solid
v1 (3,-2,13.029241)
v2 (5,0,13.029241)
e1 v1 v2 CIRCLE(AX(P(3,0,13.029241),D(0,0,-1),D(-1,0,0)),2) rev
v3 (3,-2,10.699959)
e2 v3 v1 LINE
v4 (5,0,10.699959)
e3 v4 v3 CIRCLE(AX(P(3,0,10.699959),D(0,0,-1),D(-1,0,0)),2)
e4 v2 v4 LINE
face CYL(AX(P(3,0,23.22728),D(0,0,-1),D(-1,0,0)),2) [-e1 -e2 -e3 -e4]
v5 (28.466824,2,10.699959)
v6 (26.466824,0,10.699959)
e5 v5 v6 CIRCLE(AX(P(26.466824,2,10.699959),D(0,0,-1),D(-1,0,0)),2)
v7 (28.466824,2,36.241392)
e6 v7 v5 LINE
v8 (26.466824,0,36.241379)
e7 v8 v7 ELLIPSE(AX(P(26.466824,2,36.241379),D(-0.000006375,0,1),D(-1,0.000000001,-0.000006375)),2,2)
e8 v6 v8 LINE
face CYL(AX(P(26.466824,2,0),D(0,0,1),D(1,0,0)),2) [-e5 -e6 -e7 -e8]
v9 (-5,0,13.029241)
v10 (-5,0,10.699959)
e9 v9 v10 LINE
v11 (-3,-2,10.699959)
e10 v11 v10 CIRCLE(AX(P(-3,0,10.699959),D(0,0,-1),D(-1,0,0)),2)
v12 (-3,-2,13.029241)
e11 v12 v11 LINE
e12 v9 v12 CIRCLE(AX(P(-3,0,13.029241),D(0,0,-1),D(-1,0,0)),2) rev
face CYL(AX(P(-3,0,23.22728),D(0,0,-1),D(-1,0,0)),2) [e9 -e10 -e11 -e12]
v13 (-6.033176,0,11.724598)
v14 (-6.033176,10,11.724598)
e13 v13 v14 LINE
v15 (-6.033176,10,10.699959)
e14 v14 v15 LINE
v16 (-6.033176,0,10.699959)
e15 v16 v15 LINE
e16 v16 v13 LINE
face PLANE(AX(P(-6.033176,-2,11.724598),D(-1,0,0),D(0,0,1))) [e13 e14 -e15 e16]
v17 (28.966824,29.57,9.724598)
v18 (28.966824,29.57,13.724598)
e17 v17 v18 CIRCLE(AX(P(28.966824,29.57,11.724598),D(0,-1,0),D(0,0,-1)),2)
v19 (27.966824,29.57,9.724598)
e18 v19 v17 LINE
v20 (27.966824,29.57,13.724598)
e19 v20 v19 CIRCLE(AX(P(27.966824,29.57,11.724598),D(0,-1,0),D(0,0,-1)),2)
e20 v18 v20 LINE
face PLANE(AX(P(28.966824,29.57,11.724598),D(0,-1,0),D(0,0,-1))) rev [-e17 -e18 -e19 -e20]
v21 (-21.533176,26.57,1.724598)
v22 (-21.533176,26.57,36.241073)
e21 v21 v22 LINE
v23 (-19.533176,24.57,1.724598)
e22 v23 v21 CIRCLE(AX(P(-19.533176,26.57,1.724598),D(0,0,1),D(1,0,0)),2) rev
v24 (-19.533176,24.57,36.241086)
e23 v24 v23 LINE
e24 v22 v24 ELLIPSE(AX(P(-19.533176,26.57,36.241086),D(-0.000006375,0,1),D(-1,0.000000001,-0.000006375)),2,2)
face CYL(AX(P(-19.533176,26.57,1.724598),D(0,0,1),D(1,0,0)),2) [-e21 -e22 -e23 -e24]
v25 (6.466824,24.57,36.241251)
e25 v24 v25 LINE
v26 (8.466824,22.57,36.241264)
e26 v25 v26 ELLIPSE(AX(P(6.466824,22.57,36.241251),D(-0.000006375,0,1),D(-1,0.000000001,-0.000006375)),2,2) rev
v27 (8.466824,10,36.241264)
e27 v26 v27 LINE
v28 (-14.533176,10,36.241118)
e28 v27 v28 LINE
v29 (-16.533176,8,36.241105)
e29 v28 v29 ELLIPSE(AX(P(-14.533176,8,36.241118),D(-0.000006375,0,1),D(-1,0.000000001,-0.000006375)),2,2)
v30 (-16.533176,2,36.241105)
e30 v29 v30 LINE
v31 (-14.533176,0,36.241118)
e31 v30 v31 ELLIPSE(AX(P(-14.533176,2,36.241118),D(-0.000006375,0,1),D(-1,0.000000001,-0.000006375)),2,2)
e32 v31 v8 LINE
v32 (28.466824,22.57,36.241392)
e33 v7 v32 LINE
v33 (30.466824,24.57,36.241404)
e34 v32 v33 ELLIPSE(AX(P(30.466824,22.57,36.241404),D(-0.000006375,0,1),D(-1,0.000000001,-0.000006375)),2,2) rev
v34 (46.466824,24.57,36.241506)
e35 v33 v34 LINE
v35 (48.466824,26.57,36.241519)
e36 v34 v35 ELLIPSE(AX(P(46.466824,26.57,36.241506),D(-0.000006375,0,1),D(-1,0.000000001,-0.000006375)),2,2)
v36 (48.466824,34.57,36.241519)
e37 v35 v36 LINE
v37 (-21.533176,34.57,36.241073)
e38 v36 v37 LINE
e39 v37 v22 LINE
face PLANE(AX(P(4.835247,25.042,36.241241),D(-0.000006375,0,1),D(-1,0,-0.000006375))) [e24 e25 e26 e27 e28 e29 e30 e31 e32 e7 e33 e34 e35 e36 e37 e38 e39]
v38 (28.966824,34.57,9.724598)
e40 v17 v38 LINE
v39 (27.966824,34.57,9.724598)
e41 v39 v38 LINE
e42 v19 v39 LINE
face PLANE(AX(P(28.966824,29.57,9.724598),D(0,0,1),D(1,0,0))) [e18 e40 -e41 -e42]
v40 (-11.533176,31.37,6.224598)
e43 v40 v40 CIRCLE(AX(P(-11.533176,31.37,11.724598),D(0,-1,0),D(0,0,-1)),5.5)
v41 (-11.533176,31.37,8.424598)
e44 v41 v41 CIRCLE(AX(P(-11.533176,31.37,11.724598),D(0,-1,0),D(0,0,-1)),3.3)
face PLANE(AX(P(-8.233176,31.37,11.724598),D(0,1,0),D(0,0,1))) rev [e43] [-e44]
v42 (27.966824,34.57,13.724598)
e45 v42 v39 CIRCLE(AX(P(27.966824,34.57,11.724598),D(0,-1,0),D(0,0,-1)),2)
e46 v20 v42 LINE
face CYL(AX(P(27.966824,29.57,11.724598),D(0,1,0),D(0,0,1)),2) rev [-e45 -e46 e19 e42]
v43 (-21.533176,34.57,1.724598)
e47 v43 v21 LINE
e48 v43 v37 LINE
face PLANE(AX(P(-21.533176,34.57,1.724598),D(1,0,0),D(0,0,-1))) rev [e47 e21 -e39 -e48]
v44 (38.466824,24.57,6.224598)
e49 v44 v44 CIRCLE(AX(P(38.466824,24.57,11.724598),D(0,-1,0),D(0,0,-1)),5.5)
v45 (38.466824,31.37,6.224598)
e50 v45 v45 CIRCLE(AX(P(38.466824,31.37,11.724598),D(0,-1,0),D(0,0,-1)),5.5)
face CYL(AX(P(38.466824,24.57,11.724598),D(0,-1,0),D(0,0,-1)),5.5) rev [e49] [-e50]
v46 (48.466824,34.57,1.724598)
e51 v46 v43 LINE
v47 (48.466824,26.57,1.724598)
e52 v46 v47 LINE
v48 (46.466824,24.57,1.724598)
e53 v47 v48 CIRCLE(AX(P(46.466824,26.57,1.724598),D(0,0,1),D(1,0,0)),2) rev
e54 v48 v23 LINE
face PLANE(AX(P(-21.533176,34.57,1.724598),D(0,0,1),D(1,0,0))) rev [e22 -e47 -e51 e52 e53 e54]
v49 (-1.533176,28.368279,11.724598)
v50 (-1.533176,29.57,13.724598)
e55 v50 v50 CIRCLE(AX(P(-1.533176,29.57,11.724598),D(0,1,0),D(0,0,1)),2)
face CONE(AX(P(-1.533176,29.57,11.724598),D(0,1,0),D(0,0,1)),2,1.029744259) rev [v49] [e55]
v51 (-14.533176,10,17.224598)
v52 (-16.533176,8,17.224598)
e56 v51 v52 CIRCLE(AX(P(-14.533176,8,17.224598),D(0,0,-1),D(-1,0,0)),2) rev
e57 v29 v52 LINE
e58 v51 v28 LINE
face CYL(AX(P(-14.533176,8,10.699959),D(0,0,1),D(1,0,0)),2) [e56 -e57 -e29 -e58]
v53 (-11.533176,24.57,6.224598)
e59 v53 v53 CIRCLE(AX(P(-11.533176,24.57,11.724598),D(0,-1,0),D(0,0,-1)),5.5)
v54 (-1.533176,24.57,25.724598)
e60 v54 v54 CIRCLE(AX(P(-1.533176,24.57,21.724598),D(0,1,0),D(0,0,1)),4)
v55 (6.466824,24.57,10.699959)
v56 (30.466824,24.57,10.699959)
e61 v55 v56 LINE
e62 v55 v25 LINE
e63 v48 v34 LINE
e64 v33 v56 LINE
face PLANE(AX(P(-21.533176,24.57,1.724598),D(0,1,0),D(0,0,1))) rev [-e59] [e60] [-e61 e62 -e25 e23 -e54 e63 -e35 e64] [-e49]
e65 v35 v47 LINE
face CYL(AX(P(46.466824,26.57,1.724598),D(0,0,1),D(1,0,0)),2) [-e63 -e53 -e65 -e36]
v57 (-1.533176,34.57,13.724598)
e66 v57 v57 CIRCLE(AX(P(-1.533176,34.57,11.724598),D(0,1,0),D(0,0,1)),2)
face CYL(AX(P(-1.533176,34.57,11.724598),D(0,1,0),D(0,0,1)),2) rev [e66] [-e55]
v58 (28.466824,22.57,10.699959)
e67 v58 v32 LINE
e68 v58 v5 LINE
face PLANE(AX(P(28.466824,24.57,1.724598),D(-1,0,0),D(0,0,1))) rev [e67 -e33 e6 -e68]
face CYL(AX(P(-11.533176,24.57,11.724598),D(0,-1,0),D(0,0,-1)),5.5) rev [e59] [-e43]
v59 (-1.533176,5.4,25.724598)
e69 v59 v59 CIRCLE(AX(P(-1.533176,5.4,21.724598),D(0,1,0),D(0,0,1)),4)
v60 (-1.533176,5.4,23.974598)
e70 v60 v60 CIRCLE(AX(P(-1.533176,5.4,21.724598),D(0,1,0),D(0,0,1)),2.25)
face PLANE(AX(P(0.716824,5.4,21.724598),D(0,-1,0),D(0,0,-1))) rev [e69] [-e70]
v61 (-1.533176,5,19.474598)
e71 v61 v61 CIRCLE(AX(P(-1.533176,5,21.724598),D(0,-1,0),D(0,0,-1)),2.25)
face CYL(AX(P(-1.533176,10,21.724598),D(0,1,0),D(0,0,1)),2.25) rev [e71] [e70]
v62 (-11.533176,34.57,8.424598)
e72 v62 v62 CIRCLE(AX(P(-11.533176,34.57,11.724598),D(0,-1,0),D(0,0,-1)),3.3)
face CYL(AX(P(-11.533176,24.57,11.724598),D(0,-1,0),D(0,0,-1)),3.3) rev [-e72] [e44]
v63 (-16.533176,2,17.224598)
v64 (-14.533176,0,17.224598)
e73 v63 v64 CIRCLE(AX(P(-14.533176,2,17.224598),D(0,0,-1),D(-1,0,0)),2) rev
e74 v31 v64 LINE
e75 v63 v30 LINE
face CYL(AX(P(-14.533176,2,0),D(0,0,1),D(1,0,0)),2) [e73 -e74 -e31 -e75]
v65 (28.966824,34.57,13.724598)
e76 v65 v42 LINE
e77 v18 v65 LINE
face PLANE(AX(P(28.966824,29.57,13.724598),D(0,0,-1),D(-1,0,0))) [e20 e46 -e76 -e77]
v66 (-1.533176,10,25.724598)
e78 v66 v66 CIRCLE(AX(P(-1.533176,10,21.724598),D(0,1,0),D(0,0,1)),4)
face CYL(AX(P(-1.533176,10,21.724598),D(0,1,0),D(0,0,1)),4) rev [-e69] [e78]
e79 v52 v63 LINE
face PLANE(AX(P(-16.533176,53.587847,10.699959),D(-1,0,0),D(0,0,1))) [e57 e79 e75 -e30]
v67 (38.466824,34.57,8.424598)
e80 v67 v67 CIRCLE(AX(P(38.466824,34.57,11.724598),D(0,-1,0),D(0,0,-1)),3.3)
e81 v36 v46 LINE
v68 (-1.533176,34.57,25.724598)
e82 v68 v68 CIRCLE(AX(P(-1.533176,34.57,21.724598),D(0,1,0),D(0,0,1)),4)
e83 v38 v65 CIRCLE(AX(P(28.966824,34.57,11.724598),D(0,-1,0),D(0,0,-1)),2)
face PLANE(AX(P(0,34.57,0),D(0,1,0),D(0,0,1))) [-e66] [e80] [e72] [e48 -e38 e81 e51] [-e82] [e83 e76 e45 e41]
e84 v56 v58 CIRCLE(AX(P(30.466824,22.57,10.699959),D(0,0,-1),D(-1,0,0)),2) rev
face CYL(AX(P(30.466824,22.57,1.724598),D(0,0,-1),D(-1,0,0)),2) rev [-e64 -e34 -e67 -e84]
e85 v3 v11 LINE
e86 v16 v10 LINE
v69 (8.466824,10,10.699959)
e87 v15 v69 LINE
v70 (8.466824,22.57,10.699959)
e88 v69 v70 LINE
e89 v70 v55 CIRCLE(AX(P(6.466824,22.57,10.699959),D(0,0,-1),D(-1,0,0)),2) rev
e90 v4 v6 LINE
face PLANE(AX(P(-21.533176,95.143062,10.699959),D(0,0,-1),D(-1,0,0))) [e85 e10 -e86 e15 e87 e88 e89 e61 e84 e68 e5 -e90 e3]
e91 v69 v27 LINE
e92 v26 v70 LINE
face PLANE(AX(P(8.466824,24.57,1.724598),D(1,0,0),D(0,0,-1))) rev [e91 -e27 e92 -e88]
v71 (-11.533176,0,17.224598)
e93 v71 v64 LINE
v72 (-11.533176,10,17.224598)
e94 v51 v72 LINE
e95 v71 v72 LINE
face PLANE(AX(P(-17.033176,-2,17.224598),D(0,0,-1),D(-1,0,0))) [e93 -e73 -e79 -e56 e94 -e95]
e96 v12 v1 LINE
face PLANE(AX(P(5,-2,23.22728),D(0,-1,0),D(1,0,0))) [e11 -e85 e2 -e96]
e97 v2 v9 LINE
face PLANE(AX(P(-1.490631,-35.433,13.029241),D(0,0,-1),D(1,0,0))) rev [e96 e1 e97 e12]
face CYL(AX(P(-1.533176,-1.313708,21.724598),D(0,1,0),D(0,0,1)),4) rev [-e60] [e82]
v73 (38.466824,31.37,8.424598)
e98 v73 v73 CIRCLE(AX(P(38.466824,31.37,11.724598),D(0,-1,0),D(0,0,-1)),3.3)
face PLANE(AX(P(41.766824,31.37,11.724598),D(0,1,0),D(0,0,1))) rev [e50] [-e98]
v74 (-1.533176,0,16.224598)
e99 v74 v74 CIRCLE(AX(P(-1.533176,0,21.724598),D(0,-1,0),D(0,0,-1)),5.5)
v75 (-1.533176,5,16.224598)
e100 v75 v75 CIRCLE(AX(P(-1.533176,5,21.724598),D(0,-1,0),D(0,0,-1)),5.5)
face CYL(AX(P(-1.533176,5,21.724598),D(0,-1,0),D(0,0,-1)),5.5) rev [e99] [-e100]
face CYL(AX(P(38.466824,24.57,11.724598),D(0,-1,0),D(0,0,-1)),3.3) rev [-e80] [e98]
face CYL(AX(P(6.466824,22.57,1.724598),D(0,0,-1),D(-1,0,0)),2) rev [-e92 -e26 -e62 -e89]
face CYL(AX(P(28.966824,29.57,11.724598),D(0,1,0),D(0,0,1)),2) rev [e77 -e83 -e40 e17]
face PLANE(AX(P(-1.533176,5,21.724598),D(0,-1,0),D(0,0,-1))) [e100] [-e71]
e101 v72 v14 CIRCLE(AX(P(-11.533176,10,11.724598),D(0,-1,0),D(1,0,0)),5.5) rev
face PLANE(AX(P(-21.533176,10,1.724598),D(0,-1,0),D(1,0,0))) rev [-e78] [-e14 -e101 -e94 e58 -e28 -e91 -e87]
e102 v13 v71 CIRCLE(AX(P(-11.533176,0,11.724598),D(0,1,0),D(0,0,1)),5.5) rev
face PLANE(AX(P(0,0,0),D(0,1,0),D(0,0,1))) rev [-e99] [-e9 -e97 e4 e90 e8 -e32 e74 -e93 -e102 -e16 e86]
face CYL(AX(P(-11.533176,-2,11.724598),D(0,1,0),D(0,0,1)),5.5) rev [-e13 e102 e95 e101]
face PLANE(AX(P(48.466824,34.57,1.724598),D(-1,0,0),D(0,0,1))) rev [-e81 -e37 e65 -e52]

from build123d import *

# Parameters (mm, degrees)
SKETCH_8_W                = 70
SKETCH_8_H                = 30
EXTRUDE_3_DEPTH           = 34.57
SKETCH_9_W                = 30
SKETCH_9_H                = 14.57
SKETCH_9_W_2              = 20
CUT_EXTRUDE_3_DEPTH       = 67.664217758
OTHER_1_OUTLINE_R         = 5.5
OTHER_1_DEPTH             = 5
HOLE_WIZARD_2_D           = 4.5
HOLE_WIZARD_2_DEPTH       = 10
HOLE_WIZARD_2_CBORE_D     = 8
HOLE_WIZARD_2_CBORE_DEPTH = 4.6
BACK_REACH                = 69.458
SKETCH_16_W               = 70
SKETCH_16_H               = 8.975361008
MM_1_D                    = 4
MM_1_DEPTH                = 5
MM_1_TIP                  = 1.201721238
CUT_EXTRUDE_5_DEPTH       = 5
SKETCH_24_W               = 5
SKETCH_24_H               = 21.024638992
SKETCH_24_W_2             = 20
CUT_EXTRUDE_6_DEPTH       = 10
HOLE_WIZARD_3_D           = 6.6
HOLE_WIZARD_3_DEPTH       = 10
HOLE_WIZARD_3_CBORE_D     = 11
HOLE_WIZARD_3_CBORE_DEPTH = 6.8
FILLET_1_R                = 2
SKETCH_29_W               = 10
SKETCH_29_H               = 2
EXTRUDE_5_DEPTH           = 2.329281552
FILLET_3_R                = 2
CUT_EXTRUDE_7_DEPTH       = 0.5
EXTRUDE_START             = 5.016506595
EXTRUDE_6_DEPTH           = 5.016506595
SKETCH_33_R               = 4
CUT_EXTRUDE_8_DEPTH       = 24.57
CUT_EXTRUDE_9_DEPTH       = 67.093990688


# Read off the part's stored shape, not the designer's step: 孔1
with BuildPart() as part:
    # 草图8 → 凸台-拉伸3 (new body)
    with BuildSketch(Plane(origin=(0, 0, 0), x_dir=(1, 0, 0), z_dir=(0, 1, 0))):
        with Locations((13.466824006, -16.724598186)):
            Rectangle(SKETCH_8_W, SKETCH_8_H)
    extrude(amount=EXTRUDE_3_DEPTH)

    # 草图9 → 切除-拉伸3 (cut, through all)
    with BuildSketch(Plane.XY.offset(31.724598186)):
        with Locations((-6.533175994, 17.285)):
            Rectangle(SKETCH_9_W, SKETCH_9_H)
        with Locations((38.466824006, 17.285)):
            Rectangle(SKETCH_9_W_2, SKETCH_9_H)
    extrude(amount=-CUT_EXTRUDE_3_DEPTH, mode=Mode.SUBTRACT)

    # 孔1 outline → 孔1 (cut)
    with BuildSketch(Plane(origin=(0, 0, 0), x_dir=(1, 0, 0), z_dir=(0, 1, 0))):
        with Locations((-1.533175994, -21.724598186)):
            Circle(OTHER_1_OUTLINE_R)
    extrude(amount=OTHER_1_DEPTH, mode=Mode.SUBTRACT)

    # 打孔尺寸(%根据)内六角圆柱头螺钉的类型2
    with Locations(Plane(origin=(-1.533175994, 10, 21.724598186), x_dir=(1, 0, 0), z_dir=(0, 1, 0))):
        with Locations((0, 0)):
            CounterBoreHole(HOLE_WIZARD_2_D / 2, HOLE_WIZARD_2_CBORE_D / 2, HOLE_WIZARD_2_CBORE_DEPTH, depth=HOLE_WIZARD_2_DEPTH)

    # back: up to this face of the body (flat: up to its plane)
    back_end = Plane(part.part.faces().sort_by_distance((-6.533175994, 24.57, 16.724598186))[0])
    # 草图16 → back (cut, up to the picked face)
    with BuildSketch(Plane(origin=(0, 0, 0), x_dir=(1, 0, 0), z_dir=(0, 1, 0)), mode=Mode.PRIVATE) as back_sk1:
        with Locations((13.466824006, -6.21227869)):
            Rectangle(SKETCH_16_W, SKETCH_16_H)
    back_tool1 = split(extrude(back_sk1.sketch, amount=BACK_REACH, mode=Mode.PRIVATE), bisect_by=back_end, keep=Keep.BOTH, mode=Mode.PRIVATE)
    add(back_tool1.solids().sort_by(Axis((13.466824, 0, 6.212279), (0, 1, 0)))[0], mode=Mode.SUBTRACT)

    # 大小mm 暗销孔1
    with Locations(Plane(origin=(-1.533175994, 34.57, 11.724598186), x_dir=(0, 0, 1), z_dir=(0, 1, 0))):
        with Locations((0, 0)):
            Hole(MM_1_D / 2, depth=MM_1_DEPTH)
            with Locations((0, 0, -(MM_1_DEPTH + MM_1_TIP / 2))):  # 118° drill point
                Cone(0, MM_1_D / 2, MM_1_TIP, mode=Mode.SUBTRACT)

    # 草图23 → 切除-拉伸5 (cut)
    with BuildSketch(Plane.XZ.offset(-34.57)):
        with BuildLine():
            Line((28.966824006, 9.724598186), (27.966824006, 9.724598186))
            ThreePointArc((27.966824006, 9.724598186), (25.966824006, 11.724598186), (27.966824006, 13.724598186))
            Line((27.966824006, 13.724598186), (28.966824006, 13.724598186))
            ThreePointArc((28.966824006, 13.724598186), (30.966824006, 11.724598186), (28.966824006, 9.724598186))
        make_face()
    extrude(amount=CUT_EXTRUDE_5_DEPTH, mode=Mode.SUBTRACT)

    # 草图24 → 切除-拉伸6 (cut)
    with BuildSketch(Plane(origin=(0, 0, 0), x_dir=(1, 0, 0), z_dir=(0, 1, 0))):
        with Locations((-19.033175994, -21.21227869)):
            Rectangle(SKETCH_24_W, SKETCH_24_H)
        with Locations((38.466824006, -21.21227869)):
            Rectangle(SKETCH_24_W_2, SKETCH_24_H)
    extrude(amount=CUT_EXTRUDE_6_DEPTH, mode=Mode.SUBTRACT)

    # 打孔尺寸(%根据)内六角圆柱头螺钉的类型3
    with Locations(Plane(origin=(-11.533175994, 24.57, 11.724598186), x_dir=(0, 0, -1), z_dir=(0, -1, 0))):
        with Locations((0, 0), (0, 50)):
            CounterBoreHole(HOLE_WIZARD_3_D / 2, HOLE_WIZARD_3_CBORE_D / 2, HOLE_WIZARD_3_CBORE_DEPTH, depth=HOLE_WIZARD_3_DEPTH)

    # 圆角1
    fillet_1_edges = [part.edges().sort_by_distance(p)[0] for p in [
        (-16.533175994, 0, 21.21227869),
        (-16.533175994, 10, 21.21227869),
        (28.466824006, 0, 21.21227869),
        (-21.533175994, 24.57, 16.724598186),
        (48.466824006, 24.57, 16.724598186),
        (8.466824006, 24.57, 21.21227869),
        (28.466824006, 24.57, 21.21227869),
    ]]
    fillet(fillet_1_edges, radius=FILLET_1_R)

    # 草图29 → 凸台-拉伸5 (add)
    with BuildSketch(Plane(origin=(0, 0, 10.699959194), x_dir=(-1, 0, 0), z_dir=(0, 0, -1))):
        with Locations((0, -1)):
            Rectangle(SKETCH_29_W, SKETCH_29_H)
    extrude(amount=-EXTRUDE_5_DEPTH)

    # 圆角3
    fillet_3_edges = [part.edges().sort_by_distance(p)[0] for p in [
        (-5, -2, 11.86459997),
        (5, -2, 11.86459997),
    ]]
    fillet(fillet_3_edges, radius=FILLET_3_R - 0.0001)  # a hair under: the kernel refuses the full size

    # 草图30 → 切除-拉伸7 (cut)
    with BuildSketch(Plane.XY.offset(31.724598186)):
        with BuildLine():
            Line((-14.533175994, 0), (26.466824006, 0))
            ThreePointArc((26.466824006, 0), (27.881037569, 0.585786438), (28.466824006, 2))
            Line((28.466824006, 2), (28.466824006, 22.57))
            ThreePointArc((28.466824006, 22.57), (29.052610444, 23.984213562), (30.466824006, 24.57))
            Line((30.466824006, 24.57), (46.466824006, 24.57))
            ThreePointArc((46.466824006, 24.57), (47.881037569, 25.155786438), (48.466824006, 26.57))
            Line((48.466824006, 26.57), (48.466824006, 34.57))
            Line((48.466824006, 34.57), (-21.533175994, 34.57))
            Line((-21.533175994, 34.57), (-21.533175994, 26.57))
            ThreePointArc((-21.533175994, 26.57), (-20.947389556, 25.155786438), (-19.533175994, 24.57))
            Line((-19.533175994, 24.57), (6.466824006, 24.57))
            ThreePointArc((6.466824006, 24.57), (7.881037569, 23.984213562), (8.466824006, 22.57))
            Line((8.466824006, 22.57), (8.466824006, 10))
            Line((8.466824006, 10), (-14.533175994, 10))
            ThreePointArc((-14.533175994, 10), (-15.947389556, 9.414213562), (-16.533175994, 8))
            Line((-16.533175994, 8), (-16.533175994, 2))
            ThreePointArc((-16.533175994, 2), (-15.947389556, 0.585786438), (-14.533175994, 0))
        make_face()
    extrude(amount=-CUT_EXTRUDE_7_DEPTH, mode=Mode.SUBTRACT)

    # 草图31 → 凸台-拉伸6 (add)
    with BuildSketch(Plane.XY.offset(31.224598186).offset(EXTRUDE_START)):
        with BuildLine():
            Line((-14.533175994, 0), (26.466824006, 0))
            ThreePointArc((26.466824006, 0), (27.881037569, 0.585786438), (28.466824006, 2))
            Line((28.466824006, 2), (28.466824006, 22.57))
            ThreePointArc((28.466824006, 22.57), (29.052610444, 23.984213562), (30.466824006, 24.57))
            Line((30.466824006, 24.57), (46.466824006, 24.57))
            ThreePointArc((46.466824006, 24.57), (47.881037569, 25.155786438), (48.466824006, 26.57))
            Line((48.466824006, 26.57), (48.466824006, 34.57))
            Line((48.466824006, 34.57), (-21.533175994, 34.57))
            Line((-21.533175994, 34.57), (-21.533175994, 26.57))
            ThreePointArc((-21.533175994, 26.57), (-20.947389556, 25.155786438), (-19.533175994, 24.57))
            Line((-19.533175994, 24.57), (6.466824006, 24.57))
            ThreePointArc((6.466824006, 24.57), (7.881037569, 23.984213562), (8.466824006, 22.57))
            Line((8.466824006, 22.57), (8.466824006, 10))
            Line((8.466824006, 10), (-14.533175994, 10))
            ThreePointArc((-14.533175994, 10), (-15.947389556, 9.414213562), (-16.533175994, 8))
            Line((-16.533175994, 8), (-16.533175994, 2))
            ThreePointArc((-16.533175994, 2), (-15.947389556, 0.585786438), (-14.533175994, 0))
        make_face()
    extrude(amount=-EXTRUDE_6_DEPTH)

    # 草图33 → 切除-拉伸8 (cut)
    with BuildSketch(Plane(origin=(0, 34.57, 0), x_dir=(1, 0, 0), z_dir=(0, 1, 0))):
        with Locations(Location((-1.533175994, -21.724598186, 0), (0, 0, 270))):
            Circle(SKETCH_33_R)
    extrude(amount=-CUT_EXTRUDE_8_DEPTH, mode=Mode.SUBTRACT)

    # 草图34 → 切除-拉伸9 (cut, through all)
    with BuildSketch(Plane.XZ.offset(-24.57)):
        with BuildLine():
            Line((-17.033175994, 17.224598186), (-11.533175994, 17.224598186))
            ThreePointArc((-11.533175994, 17.224598186), (-7.644088697, 15.613685483), (-6.033175994, 11.724598186))
            Line((-6.033175994, 11.724598186), (-6.033175994, 6.224598186))
            Line((-6.033175994, 6.224598186), (-17.033175994, 6.224598186))
            Line((-17.033175994, 6.224598186), (-17.033175994, 17.224598186))
        make_face()
    extrude(amount=CUT_EXTRUDE_9_DEPTH, mode=Mode.SUBTRACT)


solid = part.part
